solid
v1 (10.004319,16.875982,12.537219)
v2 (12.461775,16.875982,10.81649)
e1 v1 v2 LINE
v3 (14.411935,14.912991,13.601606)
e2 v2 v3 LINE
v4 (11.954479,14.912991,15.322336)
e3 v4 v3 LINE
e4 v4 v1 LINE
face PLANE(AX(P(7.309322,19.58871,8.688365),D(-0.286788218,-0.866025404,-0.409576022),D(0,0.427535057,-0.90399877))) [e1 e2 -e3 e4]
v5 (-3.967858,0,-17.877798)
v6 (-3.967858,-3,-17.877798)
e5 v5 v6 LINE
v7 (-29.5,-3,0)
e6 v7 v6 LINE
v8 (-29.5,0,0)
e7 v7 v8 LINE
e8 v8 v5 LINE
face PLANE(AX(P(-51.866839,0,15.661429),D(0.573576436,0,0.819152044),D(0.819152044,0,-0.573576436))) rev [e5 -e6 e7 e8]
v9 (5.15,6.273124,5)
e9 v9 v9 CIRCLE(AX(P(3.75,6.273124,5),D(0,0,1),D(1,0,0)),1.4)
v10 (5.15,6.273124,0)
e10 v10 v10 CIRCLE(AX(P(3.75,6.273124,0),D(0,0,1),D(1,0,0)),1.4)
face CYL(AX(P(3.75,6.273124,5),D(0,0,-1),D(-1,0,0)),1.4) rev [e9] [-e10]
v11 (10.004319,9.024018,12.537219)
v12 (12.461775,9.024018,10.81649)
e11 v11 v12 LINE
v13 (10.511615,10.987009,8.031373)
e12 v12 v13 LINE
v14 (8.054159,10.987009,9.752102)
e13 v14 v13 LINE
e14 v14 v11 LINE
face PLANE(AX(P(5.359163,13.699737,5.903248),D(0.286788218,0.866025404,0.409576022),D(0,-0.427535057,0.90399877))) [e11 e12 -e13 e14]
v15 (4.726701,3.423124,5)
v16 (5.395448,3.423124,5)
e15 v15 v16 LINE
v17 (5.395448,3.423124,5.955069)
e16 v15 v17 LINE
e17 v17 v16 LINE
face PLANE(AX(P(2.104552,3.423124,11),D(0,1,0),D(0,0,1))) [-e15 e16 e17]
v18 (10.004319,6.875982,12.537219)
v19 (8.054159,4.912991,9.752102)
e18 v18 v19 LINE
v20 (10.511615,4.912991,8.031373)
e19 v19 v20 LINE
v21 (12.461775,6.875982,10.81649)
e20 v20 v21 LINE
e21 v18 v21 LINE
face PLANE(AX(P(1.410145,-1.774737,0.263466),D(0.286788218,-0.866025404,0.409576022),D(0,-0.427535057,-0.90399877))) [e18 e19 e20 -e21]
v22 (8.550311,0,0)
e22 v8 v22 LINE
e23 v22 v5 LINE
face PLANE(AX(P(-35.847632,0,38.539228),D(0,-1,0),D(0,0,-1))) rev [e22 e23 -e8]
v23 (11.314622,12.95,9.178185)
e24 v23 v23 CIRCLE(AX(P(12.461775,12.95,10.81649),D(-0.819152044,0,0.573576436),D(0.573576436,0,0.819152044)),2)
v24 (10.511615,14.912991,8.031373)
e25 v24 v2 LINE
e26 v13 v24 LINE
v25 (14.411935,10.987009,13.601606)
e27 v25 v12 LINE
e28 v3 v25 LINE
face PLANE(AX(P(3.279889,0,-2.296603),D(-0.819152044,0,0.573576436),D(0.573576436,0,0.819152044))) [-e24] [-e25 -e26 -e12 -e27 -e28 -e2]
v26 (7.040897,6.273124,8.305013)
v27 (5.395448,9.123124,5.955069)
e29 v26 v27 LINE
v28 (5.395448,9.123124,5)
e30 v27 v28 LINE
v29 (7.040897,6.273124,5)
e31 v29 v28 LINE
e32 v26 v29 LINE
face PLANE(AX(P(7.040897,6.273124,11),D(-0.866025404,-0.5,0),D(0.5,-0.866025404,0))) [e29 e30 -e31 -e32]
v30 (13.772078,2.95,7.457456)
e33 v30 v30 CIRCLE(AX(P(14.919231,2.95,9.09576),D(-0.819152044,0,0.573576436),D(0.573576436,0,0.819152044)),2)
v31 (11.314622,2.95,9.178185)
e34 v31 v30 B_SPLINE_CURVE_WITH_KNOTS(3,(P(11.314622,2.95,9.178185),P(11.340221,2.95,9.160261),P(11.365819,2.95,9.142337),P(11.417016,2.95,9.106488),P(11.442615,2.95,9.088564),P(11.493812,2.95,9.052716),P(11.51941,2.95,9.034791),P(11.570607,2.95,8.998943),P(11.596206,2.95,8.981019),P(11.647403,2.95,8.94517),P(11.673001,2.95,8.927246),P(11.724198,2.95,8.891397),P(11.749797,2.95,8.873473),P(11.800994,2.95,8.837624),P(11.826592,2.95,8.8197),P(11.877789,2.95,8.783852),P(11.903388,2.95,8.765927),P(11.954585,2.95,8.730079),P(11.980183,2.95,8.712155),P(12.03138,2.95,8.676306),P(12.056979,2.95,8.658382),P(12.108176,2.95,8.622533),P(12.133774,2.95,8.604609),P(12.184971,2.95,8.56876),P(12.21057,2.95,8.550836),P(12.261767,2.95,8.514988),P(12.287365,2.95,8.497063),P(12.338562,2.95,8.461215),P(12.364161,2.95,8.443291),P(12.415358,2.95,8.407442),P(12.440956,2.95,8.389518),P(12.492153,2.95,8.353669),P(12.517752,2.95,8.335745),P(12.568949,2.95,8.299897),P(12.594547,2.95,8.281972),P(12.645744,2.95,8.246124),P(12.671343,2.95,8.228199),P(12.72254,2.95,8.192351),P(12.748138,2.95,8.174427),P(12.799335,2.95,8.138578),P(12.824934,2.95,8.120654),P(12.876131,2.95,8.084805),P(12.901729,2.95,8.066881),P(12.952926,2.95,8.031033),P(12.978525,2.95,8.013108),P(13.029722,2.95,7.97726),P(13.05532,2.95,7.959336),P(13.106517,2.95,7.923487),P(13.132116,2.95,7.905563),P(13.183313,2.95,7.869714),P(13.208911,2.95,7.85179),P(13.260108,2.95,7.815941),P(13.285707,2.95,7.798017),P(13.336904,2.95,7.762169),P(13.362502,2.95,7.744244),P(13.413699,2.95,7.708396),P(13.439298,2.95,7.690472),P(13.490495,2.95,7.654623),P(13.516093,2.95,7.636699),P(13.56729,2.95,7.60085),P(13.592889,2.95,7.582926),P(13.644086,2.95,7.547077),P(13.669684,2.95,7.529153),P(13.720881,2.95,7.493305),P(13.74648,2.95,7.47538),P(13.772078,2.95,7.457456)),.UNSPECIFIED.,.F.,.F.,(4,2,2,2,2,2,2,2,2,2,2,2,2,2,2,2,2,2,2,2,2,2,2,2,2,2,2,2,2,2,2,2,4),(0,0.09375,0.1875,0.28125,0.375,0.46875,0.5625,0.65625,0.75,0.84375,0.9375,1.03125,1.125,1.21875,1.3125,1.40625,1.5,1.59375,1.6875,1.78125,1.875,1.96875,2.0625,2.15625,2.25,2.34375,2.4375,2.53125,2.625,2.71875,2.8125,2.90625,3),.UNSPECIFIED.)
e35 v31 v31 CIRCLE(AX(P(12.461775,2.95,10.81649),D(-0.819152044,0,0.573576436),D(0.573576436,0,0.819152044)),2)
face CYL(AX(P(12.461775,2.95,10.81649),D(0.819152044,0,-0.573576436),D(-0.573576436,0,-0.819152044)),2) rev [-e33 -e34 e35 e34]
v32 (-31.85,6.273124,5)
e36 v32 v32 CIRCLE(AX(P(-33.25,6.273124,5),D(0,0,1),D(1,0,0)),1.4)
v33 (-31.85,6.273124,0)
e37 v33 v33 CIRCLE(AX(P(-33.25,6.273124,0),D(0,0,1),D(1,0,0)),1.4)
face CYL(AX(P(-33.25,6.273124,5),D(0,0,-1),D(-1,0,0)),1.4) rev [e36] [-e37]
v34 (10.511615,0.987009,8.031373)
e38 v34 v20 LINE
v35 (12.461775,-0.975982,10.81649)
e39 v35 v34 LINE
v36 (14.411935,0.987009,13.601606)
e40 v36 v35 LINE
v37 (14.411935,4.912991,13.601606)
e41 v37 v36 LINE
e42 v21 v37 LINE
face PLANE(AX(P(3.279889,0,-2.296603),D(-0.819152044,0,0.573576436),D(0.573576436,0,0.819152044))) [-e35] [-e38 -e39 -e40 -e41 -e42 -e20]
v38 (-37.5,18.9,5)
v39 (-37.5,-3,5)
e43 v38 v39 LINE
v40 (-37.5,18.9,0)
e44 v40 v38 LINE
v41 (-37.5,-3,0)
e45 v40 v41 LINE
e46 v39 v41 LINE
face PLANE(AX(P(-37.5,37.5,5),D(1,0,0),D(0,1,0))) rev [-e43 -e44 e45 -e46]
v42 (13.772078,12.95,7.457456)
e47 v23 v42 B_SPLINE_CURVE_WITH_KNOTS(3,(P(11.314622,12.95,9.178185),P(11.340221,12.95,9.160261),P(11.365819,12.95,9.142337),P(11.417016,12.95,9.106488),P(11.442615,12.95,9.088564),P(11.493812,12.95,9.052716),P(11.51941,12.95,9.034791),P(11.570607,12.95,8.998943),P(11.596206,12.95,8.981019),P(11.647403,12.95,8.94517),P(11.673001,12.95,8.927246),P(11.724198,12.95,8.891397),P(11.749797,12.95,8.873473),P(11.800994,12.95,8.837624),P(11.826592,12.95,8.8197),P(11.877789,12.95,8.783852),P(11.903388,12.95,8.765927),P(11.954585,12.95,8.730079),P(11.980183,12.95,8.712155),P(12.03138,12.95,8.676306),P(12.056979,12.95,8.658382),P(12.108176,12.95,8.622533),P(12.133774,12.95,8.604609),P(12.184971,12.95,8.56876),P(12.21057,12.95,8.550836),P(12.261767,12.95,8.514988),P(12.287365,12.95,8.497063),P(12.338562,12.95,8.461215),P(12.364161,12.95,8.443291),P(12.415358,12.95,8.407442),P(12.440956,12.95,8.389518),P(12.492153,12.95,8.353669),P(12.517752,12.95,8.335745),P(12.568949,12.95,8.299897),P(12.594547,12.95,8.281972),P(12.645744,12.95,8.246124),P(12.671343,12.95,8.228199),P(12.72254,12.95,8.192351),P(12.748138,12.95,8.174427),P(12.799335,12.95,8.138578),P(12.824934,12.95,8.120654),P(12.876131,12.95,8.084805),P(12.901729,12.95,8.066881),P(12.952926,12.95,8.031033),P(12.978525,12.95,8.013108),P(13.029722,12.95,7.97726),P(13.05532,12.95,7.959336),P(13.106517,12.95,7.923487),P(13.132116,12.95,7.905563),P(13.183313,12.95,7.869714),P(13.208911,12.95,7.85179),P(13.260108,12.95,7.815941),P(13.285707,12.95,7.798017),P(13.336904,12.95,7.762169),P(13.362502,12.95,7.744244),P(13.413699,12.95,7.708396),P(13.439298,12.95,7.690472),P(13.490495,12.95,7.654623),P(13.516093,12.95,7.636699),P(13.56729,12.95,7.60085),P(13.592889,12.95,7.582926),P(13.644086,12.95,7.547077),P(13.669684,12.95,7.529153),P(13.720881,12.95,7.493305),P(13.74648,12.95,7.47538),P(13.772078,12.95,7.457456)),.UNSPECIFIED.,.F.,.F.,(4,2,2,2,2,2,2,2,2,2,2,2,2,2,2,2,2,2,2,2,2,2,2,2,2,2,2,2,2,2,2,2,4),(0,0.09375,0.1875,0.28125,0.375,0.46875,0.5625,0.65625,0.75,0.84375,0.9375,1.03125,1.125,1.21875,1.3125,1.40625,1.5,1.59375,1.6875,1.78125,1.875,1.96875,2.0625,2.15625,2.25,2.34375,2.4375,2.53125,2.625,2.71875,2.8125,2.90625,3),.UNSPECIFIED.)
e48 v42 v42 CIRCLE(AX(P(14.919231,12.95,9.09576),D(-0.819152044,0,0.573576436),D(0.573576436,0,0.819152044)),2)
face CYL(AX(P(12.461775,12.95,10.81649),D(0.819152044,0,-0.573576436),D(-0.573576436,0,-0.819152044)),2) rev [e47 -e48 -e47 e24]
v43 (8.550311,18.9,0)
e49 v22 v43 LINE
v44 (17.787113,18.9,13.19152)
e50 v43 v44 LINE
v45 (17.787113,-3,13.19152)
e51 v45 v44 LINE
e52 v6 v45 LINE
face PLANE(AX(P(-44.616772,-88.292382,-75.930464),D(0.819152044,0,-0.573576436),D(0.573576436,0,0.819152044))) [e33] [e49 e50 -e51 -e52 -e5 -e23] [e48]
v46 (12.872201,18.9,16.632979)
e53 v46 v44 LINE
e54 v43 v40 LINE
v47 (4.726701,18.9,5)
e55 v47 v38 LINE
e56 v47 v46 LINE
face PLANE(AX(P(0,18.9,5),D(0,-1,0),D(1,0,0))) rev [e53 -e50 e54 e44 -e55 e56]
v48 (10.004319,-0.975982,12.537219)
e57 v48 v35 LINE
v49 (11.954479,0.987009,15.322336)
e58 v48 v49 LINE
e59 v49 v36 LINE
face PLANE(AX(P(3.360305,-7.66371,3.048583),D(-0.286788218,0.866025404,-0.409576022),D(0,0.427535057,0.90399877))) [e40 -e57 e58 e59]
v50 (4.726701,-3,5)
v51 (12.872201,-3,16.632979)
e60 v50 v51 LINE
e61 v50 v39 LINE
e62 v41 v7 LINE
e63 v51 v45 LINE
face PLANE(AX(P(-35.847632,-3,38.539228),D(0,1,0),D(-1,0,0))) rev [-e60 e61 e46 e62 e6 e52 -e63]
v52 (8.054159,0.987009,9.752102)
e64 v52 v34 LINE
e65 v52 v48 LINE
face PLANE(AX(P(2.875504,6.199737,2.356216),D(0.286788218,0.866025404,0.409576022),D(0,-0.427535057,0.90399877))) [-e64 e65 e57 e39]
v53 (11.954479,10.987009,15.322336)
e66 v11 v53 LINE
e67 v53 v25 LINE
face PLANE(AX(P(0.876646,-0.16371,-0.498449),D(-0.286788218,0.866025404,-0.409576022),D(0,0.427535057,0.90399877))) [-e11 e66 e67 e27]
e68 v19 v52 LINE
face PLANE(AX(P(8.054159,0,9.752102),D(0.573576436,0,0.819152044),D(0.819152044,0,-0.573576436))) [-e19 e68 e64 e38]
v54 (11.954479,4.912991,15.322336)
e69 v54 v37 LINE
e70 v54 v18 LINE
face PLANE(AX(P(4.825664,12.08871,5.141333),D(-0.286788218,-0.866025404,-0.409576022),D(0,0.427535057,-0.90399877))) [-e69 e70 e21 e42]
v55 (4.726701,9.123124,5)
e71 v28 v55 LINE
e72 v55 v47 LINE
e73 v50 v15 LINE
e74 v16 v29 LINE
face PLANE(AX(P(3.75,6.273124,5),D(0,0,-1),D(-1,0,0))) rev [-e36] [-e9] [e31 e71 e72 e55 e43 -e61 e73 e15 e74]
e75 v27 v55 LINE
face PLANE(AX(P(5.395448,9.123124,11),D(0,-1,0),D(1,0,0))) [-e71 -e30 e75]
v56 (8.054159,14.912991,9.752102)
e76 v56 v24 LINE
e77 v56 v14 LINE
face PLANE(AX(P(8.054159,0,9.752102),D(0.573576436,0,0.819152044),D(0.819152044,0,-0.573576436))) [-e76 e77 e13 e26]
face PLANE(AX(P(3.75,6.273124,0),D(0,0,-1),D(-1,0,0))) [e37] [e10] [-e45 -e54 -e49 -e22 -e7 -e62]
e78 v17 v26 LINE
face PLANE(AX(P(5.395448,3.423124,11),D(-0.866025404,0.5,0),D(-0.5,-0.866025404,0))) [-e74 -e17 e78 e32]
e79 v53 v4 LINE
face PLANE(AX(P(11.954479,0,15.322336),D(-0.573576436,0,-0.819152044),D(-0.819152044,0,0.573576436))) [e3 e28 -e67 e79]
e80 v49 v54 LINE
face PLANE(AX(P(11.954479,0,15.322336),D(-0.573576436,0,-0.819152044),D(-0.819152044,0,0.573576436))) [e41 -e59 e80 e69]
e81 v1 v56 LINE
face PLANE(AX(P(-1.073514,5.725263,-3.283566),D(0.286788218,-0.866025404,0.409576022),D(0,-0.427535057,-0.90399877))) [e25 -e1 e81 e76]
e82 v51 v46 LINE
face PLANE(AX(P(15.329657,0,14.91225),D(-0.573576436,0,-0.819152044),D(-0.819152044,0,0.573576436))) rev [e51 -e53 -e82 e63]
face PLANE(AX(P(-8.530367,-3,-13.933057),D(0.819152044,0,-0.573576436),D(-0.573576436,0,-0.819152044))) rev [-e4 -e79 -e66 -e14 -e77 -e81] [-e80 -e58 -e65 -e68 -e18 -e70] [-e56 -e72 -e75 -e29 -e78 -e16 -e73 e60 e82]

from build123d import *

# Parameters (mm, degrees)
SKETCH1_R            = 1.4
BOSS_EXTRUDE1_DEPTH  = 5
BOSS_EXTRUDE9_DEPTH  = 18.9
SKETCH1_4_R          = 1.4
CUT_EXTRUDE4_DEPTH   = 5
BOSS_EXTRUDE10_REACH = 49.608
SKETCH5_W            = 27.928634905
SKETCH5_H            = 3
SKETCH8_W            = 10
SKETCH8_H            = 21.9
SKETCH8_R            = 2
BOSS_EXTRUDE11_DEPTH = 3
SKETCH8_3_W          = 10
SKETCH8_3_H          = 21.9
BOSS_EXTRUDE12_DEPTH = 6
BOSS_EXTRUDE13_START = -3
BOSS_EXTRUDE13_DEPTH = 21.9
CUT_EXTRUDE5_DEPTH   = 6
BOSS_EXTRUDE14_DEPTH = 5
SKETCH11_2_W         = 8
SKETCH11_2_H         = 5
BOSS_EXTRUDE15_DEPTH = 3
SKETCH12_W           = 8
SKETCH12_H           = 5
CUT_EXTRUDE6_DEPTH   = 18.6


# Read off the part's stored shape, not the designer's step: Boss-Extrude9, Boss-Extrude13, Boss-Extrude14
with BuildPart() as part:
    # Sketch1 → Boss-Extrude1 (new body)
    with BuildSketch(Plane.XY):
        with BuildLine():
            Line((3.38, 2.541421507), (0, 2.523123532))
            Line((0, 2.523123532), (0, 0))
            Line((0, 0), (-29.5, 0))
            Line((-29.5, 0), (-29.5, 2.523123532))
            Line((-29.5, 2.523123532), (-32.88, 2.523123532))
            ThreePointArc((-32.88, 2.523123532), (-37.018209124, 6.273123532), (-32.88, 10.023123532))
            Line((-32.88, 10.023123532), (-29.5, 10.023123532))
            Line((-29.5, 10.023123532), (-29.5, 18.9))
            Line((-29.5, 18.9), (0, 18.9))
            Line((0, 18.9), (0, 10.023123532))
            Line((0, 10.023123532), (3.75, 10.023123532))
            ThreePointArc((3.75, 10.023123532), (7.495422713, 6.087897443), (3.38, 2.541421507))
        make_face()
        with Locations((3.75, 6.273123532)):
            Circle(SKETCH1_R, mode=Mode.SUBTRACT)
        with Locations((-33.25, 6.273123532)):
            Circle(SKETCH1_R, mode=Mode.SUBTRACT)
    extrude(amount=BOSS_EXTRUDE1_DEPTH)

    # Boss-Extrude9 outline → Boss-Extrude9 (add)
    with BuildSketch(Plane(origin=(0, 0, 0), x_dir=(1, 0, 0), z_dir=(0, 1, 0))):
        Polygon((0, -5), (12.051348998, -5), (8.550311307, 0), (0, 0), align=None)
    extrude(amount=BOSS_EXTRUDE9_DEPTH)

    # Sketch1<4> → Cut-Extrude4 (cut)
    with BuildSketch(Plane.XY):
        with Locations((3.75, 6.273123532)):
            Circle(SKETCH1_4_R)
    extrude(amount=CUT_EXTRUDE4_DEPTH, mode=Mode.SUBTRACT)

    # Boss-Extrude10: up to this face of the body (flat: up to its plane)
    boss_extrude10_end = Plane(part.part.faces().sort_by_distance((-10.115754309, 9.30291887, 5))[0])
    # Sketch5 → Boss-Extrude10 (add, up to the picked face)
    with BuildSketch(Plane(origin=(5.737345003, 0, -4.01733222), x_dir=(0.5735764363510504, 0, 0.8191520442889888), z_dir=(-0.8191520442889888, 0, 0.5735764363510504)), mode=Mode.PRIVATE) as boss_extrude10_sk1:
        with Locations((-2.95618742, -1.5)):
            Rectangle(SKETCH5_W, SKETCH5_H)
    boss_extrude10_tool1 = split(extrude(boss_extrude10_sk1.sketch, amount=BOSS_EXTRUDE10_REACH, mode=Mode.PRIVATE), bisect_by=boss_extrude10_end, keep=Keep.BOTH, mode=Mode.PRIVATE)
    add(boss_extrude10_tool1.solids().sort_by(Axis((4.041746, -1.5, -6.438899), (-0.8191520442889888, 0, 0.5735764363510504)))[0])



with BuildPart() as body_2:
    # Sketch8 → Boss-Extrude11 (new body)
    # profile 1 of 3: a face of its own
    with BuildSketch(Plane(origin=(5.737345003, 0, -4.01733222), x_dir=(0.5735764363510504, 0, 0.8191520442889888), z_dir=(-0.8191520442889888, 0, 0.5735764363510504))):
        with Locations((16.008130033, 7.95)):
            Rectangle(SKETCH8_W, SKETCH8_H)
        Polygon((19.408130033, 14.912990915), (16.008130033, 16.87598183), (12.608130033, 14.912990915), (12.608130033, 10.987009085), (16.008130033, 9.02401817), (19.408130033, 10.987009085), align=None, mode=Mode.SUBTRACT)
        Polygon((16.008130033, 6.87598183), (12.608130033, 4.912990915), (12.608130033, 0.987009085), (16.008130033, -0.97598183), (19.408130033, 0.987009085), (19.408130033, 4.912990915), align=None, mode=Mode.SUBTRACT)
    # profile 2 of 3: a face of its own
    with BuildSketch(Plane(origin=(5.737345003, 0, -4.01733222), x_dir=(0.5735764363510504, 0, 0.8191520442889888), z_dir=(-0.8191520442889888, 0, 0.5735764363510504))):
        Polygon((19.408130033, 4.912990915), (16.008130033, 6.87598183), (12.608130033, 4.912990915), (12.608130033, 0.987009085), (16.008130033, -0.97598183), (19.408130033, 0.987009085), align=None)
        with Locations(Location((16.008130033, 2.95, 0), (0, 0, 180))):
            Circle(SKETCH8_R, mode=Mode.SUBTRACT)
    # profile 3 of 3: a face of its own
    with BuildSketch(Plane(origin=(5.737345003, 0, -4.01733222), x_dir=(0.5735764363510504, 0, 0.8191520442889888), z_dir=(-0.8191520442889888, 0, 0.5735764363510504))):
        Polygon((19.408130033, 10.987009085), (19.408130033, 14.912990915), (16.008130033, 16.87598183), (12.608130033, 14.912990915), (12.608130033, 10.987009085), (16.008130033, 9.02401817), align=None)
        with Locations(Location((16.008130033, 12.95, 0), (0, 0, 180))):
            Circle(SKETCH8_R, mode=Mode.SUBTRACT)
    extrude(amount=BOSS_EXTRUDE11_DEPTH)

    # Sketch8<3> → Boss-Extrude12 (add)
    with BuildSketch(Plane(origin=(5.737345003, 0, -4.01733222), x_dir=(0.5735764363510504, 0, 0.8191520442889888), z_dir=(-0.8191520442889888, 0, 0.5735764363510504))):
        with Locations((16.008130033, 7.95)):
            Rectangle(SKETCH8_3_W, SKETCH8_3_H)
        Polygon((19.408130033, 14.912990915), (16.008130033, 16.87598183), (12.608130033, 14.912990915), (12.608130033, 10.987009085), (16.008130033, 9.02401817), (19.408130033, 10.987009085), align=None, mode=Mode.SUBTRACT)
        Polygon((16.008130033, 6.87598183), (12.608130033, 4.912990915), (12.608130033, 0.987009085), (16.008130033, -0.97598183), (19.408130033, 0.987009085), (19.408130033, 4.912990915), align=None, mode=Mode.SUBTRACT)
    extrude(amount=BOSS_EXTRUDE12_DEPTH)


with BuildPart() as part_1:
    add(part.part)

    add(body_2.part)  # Boss-Extrude13 merges body 2
    # Boss-Extrude13 outline → Boss-Extrude13 (add)
    with BuildSketch(Plane(origin=(0, 0, 0), x_dir=(1, 0, 0), z_dir=(0, 1, 0)).offset(BOSS_EXTRUDE13_START)):
        Polygon((12.051348998, -5), (4.726701466, -5), (7.136436733, -8.441458618), align=None)
    extrude(amount=BOSS_EXTRUDE13_DEPTH)

    # Sketch10 → Cut-Extrude5 (cut)
    with BuildSketch(Plane.XY.offset(5)):
        Polygon((2.104551733, 9.123123532), (0.459103466, 6.273123532), (2.104551733, 3.423123532), (5.395448267, 3.423123532), (7.040896534, 6.273123532), (5.395448267, 9.123123532), align=None)
    extrude(amount=CUT_EXTRUDE5_DEPTH, mode=Mode.SUBTRACT)

    # Boss-Extrude14 outline → Boss-Extrude14 (add)
    with BuildSketch(Plane.XY):
        with BuildLine():
            Line((-29.5, 10.023123532), (-29.5, 37.5))
            Line((-29.5, 37.5), (-37.5, 37.5))
            Line((-37.5, 37.5), (-37.5, 0))
            Line((-37.5, 0), (-29.5, 0))
            Line((-29.5, 0), (-29.5, 2.523123532))
            Line((-29.5, 2.523123532), (-32.88, 2.523123532))
            ThreePointArc((-32.88, 2.523123532), (-37.018209124, 6.273123532), (-32.88, 10.023123532))
            Line((-32.88, 10.023123532), (-29.5, 10.023123532))
        make_face()
    extrude(amount=BOSS_EXTRUDE14_DEPTH)

    # Sketch11<2> → Boss-Extrude15 (add)
    with BuildSketch(Plane(origin=(0, 0, 0), x_dir=(1, 0, 0), z_dir=(0, 1, 0))):
        with Locations((-33.5, -2.5)):
            Rectangle(SKETCH11_2_W, SKETCH11_2_H)
    extrude(amount=-BOSS_EXTRUDE15_DEPTH)

    # Sketch12 → Cut-Extrude6 (cut)
    with BuildSketch(Plane(origin=(0, 37.5, 0), x_dir=(1, 0, 0), z_dir=(0, 1, 0))):
        with Locations((-33.5, -2.5)):
            Rectangle(SKETCH12_W, SKETCH12_H)
    extrude(amount=-CUT_EXTRUDE6_DEPTH, mode=Mode.SUBTRACT)


solid = part_1.part
